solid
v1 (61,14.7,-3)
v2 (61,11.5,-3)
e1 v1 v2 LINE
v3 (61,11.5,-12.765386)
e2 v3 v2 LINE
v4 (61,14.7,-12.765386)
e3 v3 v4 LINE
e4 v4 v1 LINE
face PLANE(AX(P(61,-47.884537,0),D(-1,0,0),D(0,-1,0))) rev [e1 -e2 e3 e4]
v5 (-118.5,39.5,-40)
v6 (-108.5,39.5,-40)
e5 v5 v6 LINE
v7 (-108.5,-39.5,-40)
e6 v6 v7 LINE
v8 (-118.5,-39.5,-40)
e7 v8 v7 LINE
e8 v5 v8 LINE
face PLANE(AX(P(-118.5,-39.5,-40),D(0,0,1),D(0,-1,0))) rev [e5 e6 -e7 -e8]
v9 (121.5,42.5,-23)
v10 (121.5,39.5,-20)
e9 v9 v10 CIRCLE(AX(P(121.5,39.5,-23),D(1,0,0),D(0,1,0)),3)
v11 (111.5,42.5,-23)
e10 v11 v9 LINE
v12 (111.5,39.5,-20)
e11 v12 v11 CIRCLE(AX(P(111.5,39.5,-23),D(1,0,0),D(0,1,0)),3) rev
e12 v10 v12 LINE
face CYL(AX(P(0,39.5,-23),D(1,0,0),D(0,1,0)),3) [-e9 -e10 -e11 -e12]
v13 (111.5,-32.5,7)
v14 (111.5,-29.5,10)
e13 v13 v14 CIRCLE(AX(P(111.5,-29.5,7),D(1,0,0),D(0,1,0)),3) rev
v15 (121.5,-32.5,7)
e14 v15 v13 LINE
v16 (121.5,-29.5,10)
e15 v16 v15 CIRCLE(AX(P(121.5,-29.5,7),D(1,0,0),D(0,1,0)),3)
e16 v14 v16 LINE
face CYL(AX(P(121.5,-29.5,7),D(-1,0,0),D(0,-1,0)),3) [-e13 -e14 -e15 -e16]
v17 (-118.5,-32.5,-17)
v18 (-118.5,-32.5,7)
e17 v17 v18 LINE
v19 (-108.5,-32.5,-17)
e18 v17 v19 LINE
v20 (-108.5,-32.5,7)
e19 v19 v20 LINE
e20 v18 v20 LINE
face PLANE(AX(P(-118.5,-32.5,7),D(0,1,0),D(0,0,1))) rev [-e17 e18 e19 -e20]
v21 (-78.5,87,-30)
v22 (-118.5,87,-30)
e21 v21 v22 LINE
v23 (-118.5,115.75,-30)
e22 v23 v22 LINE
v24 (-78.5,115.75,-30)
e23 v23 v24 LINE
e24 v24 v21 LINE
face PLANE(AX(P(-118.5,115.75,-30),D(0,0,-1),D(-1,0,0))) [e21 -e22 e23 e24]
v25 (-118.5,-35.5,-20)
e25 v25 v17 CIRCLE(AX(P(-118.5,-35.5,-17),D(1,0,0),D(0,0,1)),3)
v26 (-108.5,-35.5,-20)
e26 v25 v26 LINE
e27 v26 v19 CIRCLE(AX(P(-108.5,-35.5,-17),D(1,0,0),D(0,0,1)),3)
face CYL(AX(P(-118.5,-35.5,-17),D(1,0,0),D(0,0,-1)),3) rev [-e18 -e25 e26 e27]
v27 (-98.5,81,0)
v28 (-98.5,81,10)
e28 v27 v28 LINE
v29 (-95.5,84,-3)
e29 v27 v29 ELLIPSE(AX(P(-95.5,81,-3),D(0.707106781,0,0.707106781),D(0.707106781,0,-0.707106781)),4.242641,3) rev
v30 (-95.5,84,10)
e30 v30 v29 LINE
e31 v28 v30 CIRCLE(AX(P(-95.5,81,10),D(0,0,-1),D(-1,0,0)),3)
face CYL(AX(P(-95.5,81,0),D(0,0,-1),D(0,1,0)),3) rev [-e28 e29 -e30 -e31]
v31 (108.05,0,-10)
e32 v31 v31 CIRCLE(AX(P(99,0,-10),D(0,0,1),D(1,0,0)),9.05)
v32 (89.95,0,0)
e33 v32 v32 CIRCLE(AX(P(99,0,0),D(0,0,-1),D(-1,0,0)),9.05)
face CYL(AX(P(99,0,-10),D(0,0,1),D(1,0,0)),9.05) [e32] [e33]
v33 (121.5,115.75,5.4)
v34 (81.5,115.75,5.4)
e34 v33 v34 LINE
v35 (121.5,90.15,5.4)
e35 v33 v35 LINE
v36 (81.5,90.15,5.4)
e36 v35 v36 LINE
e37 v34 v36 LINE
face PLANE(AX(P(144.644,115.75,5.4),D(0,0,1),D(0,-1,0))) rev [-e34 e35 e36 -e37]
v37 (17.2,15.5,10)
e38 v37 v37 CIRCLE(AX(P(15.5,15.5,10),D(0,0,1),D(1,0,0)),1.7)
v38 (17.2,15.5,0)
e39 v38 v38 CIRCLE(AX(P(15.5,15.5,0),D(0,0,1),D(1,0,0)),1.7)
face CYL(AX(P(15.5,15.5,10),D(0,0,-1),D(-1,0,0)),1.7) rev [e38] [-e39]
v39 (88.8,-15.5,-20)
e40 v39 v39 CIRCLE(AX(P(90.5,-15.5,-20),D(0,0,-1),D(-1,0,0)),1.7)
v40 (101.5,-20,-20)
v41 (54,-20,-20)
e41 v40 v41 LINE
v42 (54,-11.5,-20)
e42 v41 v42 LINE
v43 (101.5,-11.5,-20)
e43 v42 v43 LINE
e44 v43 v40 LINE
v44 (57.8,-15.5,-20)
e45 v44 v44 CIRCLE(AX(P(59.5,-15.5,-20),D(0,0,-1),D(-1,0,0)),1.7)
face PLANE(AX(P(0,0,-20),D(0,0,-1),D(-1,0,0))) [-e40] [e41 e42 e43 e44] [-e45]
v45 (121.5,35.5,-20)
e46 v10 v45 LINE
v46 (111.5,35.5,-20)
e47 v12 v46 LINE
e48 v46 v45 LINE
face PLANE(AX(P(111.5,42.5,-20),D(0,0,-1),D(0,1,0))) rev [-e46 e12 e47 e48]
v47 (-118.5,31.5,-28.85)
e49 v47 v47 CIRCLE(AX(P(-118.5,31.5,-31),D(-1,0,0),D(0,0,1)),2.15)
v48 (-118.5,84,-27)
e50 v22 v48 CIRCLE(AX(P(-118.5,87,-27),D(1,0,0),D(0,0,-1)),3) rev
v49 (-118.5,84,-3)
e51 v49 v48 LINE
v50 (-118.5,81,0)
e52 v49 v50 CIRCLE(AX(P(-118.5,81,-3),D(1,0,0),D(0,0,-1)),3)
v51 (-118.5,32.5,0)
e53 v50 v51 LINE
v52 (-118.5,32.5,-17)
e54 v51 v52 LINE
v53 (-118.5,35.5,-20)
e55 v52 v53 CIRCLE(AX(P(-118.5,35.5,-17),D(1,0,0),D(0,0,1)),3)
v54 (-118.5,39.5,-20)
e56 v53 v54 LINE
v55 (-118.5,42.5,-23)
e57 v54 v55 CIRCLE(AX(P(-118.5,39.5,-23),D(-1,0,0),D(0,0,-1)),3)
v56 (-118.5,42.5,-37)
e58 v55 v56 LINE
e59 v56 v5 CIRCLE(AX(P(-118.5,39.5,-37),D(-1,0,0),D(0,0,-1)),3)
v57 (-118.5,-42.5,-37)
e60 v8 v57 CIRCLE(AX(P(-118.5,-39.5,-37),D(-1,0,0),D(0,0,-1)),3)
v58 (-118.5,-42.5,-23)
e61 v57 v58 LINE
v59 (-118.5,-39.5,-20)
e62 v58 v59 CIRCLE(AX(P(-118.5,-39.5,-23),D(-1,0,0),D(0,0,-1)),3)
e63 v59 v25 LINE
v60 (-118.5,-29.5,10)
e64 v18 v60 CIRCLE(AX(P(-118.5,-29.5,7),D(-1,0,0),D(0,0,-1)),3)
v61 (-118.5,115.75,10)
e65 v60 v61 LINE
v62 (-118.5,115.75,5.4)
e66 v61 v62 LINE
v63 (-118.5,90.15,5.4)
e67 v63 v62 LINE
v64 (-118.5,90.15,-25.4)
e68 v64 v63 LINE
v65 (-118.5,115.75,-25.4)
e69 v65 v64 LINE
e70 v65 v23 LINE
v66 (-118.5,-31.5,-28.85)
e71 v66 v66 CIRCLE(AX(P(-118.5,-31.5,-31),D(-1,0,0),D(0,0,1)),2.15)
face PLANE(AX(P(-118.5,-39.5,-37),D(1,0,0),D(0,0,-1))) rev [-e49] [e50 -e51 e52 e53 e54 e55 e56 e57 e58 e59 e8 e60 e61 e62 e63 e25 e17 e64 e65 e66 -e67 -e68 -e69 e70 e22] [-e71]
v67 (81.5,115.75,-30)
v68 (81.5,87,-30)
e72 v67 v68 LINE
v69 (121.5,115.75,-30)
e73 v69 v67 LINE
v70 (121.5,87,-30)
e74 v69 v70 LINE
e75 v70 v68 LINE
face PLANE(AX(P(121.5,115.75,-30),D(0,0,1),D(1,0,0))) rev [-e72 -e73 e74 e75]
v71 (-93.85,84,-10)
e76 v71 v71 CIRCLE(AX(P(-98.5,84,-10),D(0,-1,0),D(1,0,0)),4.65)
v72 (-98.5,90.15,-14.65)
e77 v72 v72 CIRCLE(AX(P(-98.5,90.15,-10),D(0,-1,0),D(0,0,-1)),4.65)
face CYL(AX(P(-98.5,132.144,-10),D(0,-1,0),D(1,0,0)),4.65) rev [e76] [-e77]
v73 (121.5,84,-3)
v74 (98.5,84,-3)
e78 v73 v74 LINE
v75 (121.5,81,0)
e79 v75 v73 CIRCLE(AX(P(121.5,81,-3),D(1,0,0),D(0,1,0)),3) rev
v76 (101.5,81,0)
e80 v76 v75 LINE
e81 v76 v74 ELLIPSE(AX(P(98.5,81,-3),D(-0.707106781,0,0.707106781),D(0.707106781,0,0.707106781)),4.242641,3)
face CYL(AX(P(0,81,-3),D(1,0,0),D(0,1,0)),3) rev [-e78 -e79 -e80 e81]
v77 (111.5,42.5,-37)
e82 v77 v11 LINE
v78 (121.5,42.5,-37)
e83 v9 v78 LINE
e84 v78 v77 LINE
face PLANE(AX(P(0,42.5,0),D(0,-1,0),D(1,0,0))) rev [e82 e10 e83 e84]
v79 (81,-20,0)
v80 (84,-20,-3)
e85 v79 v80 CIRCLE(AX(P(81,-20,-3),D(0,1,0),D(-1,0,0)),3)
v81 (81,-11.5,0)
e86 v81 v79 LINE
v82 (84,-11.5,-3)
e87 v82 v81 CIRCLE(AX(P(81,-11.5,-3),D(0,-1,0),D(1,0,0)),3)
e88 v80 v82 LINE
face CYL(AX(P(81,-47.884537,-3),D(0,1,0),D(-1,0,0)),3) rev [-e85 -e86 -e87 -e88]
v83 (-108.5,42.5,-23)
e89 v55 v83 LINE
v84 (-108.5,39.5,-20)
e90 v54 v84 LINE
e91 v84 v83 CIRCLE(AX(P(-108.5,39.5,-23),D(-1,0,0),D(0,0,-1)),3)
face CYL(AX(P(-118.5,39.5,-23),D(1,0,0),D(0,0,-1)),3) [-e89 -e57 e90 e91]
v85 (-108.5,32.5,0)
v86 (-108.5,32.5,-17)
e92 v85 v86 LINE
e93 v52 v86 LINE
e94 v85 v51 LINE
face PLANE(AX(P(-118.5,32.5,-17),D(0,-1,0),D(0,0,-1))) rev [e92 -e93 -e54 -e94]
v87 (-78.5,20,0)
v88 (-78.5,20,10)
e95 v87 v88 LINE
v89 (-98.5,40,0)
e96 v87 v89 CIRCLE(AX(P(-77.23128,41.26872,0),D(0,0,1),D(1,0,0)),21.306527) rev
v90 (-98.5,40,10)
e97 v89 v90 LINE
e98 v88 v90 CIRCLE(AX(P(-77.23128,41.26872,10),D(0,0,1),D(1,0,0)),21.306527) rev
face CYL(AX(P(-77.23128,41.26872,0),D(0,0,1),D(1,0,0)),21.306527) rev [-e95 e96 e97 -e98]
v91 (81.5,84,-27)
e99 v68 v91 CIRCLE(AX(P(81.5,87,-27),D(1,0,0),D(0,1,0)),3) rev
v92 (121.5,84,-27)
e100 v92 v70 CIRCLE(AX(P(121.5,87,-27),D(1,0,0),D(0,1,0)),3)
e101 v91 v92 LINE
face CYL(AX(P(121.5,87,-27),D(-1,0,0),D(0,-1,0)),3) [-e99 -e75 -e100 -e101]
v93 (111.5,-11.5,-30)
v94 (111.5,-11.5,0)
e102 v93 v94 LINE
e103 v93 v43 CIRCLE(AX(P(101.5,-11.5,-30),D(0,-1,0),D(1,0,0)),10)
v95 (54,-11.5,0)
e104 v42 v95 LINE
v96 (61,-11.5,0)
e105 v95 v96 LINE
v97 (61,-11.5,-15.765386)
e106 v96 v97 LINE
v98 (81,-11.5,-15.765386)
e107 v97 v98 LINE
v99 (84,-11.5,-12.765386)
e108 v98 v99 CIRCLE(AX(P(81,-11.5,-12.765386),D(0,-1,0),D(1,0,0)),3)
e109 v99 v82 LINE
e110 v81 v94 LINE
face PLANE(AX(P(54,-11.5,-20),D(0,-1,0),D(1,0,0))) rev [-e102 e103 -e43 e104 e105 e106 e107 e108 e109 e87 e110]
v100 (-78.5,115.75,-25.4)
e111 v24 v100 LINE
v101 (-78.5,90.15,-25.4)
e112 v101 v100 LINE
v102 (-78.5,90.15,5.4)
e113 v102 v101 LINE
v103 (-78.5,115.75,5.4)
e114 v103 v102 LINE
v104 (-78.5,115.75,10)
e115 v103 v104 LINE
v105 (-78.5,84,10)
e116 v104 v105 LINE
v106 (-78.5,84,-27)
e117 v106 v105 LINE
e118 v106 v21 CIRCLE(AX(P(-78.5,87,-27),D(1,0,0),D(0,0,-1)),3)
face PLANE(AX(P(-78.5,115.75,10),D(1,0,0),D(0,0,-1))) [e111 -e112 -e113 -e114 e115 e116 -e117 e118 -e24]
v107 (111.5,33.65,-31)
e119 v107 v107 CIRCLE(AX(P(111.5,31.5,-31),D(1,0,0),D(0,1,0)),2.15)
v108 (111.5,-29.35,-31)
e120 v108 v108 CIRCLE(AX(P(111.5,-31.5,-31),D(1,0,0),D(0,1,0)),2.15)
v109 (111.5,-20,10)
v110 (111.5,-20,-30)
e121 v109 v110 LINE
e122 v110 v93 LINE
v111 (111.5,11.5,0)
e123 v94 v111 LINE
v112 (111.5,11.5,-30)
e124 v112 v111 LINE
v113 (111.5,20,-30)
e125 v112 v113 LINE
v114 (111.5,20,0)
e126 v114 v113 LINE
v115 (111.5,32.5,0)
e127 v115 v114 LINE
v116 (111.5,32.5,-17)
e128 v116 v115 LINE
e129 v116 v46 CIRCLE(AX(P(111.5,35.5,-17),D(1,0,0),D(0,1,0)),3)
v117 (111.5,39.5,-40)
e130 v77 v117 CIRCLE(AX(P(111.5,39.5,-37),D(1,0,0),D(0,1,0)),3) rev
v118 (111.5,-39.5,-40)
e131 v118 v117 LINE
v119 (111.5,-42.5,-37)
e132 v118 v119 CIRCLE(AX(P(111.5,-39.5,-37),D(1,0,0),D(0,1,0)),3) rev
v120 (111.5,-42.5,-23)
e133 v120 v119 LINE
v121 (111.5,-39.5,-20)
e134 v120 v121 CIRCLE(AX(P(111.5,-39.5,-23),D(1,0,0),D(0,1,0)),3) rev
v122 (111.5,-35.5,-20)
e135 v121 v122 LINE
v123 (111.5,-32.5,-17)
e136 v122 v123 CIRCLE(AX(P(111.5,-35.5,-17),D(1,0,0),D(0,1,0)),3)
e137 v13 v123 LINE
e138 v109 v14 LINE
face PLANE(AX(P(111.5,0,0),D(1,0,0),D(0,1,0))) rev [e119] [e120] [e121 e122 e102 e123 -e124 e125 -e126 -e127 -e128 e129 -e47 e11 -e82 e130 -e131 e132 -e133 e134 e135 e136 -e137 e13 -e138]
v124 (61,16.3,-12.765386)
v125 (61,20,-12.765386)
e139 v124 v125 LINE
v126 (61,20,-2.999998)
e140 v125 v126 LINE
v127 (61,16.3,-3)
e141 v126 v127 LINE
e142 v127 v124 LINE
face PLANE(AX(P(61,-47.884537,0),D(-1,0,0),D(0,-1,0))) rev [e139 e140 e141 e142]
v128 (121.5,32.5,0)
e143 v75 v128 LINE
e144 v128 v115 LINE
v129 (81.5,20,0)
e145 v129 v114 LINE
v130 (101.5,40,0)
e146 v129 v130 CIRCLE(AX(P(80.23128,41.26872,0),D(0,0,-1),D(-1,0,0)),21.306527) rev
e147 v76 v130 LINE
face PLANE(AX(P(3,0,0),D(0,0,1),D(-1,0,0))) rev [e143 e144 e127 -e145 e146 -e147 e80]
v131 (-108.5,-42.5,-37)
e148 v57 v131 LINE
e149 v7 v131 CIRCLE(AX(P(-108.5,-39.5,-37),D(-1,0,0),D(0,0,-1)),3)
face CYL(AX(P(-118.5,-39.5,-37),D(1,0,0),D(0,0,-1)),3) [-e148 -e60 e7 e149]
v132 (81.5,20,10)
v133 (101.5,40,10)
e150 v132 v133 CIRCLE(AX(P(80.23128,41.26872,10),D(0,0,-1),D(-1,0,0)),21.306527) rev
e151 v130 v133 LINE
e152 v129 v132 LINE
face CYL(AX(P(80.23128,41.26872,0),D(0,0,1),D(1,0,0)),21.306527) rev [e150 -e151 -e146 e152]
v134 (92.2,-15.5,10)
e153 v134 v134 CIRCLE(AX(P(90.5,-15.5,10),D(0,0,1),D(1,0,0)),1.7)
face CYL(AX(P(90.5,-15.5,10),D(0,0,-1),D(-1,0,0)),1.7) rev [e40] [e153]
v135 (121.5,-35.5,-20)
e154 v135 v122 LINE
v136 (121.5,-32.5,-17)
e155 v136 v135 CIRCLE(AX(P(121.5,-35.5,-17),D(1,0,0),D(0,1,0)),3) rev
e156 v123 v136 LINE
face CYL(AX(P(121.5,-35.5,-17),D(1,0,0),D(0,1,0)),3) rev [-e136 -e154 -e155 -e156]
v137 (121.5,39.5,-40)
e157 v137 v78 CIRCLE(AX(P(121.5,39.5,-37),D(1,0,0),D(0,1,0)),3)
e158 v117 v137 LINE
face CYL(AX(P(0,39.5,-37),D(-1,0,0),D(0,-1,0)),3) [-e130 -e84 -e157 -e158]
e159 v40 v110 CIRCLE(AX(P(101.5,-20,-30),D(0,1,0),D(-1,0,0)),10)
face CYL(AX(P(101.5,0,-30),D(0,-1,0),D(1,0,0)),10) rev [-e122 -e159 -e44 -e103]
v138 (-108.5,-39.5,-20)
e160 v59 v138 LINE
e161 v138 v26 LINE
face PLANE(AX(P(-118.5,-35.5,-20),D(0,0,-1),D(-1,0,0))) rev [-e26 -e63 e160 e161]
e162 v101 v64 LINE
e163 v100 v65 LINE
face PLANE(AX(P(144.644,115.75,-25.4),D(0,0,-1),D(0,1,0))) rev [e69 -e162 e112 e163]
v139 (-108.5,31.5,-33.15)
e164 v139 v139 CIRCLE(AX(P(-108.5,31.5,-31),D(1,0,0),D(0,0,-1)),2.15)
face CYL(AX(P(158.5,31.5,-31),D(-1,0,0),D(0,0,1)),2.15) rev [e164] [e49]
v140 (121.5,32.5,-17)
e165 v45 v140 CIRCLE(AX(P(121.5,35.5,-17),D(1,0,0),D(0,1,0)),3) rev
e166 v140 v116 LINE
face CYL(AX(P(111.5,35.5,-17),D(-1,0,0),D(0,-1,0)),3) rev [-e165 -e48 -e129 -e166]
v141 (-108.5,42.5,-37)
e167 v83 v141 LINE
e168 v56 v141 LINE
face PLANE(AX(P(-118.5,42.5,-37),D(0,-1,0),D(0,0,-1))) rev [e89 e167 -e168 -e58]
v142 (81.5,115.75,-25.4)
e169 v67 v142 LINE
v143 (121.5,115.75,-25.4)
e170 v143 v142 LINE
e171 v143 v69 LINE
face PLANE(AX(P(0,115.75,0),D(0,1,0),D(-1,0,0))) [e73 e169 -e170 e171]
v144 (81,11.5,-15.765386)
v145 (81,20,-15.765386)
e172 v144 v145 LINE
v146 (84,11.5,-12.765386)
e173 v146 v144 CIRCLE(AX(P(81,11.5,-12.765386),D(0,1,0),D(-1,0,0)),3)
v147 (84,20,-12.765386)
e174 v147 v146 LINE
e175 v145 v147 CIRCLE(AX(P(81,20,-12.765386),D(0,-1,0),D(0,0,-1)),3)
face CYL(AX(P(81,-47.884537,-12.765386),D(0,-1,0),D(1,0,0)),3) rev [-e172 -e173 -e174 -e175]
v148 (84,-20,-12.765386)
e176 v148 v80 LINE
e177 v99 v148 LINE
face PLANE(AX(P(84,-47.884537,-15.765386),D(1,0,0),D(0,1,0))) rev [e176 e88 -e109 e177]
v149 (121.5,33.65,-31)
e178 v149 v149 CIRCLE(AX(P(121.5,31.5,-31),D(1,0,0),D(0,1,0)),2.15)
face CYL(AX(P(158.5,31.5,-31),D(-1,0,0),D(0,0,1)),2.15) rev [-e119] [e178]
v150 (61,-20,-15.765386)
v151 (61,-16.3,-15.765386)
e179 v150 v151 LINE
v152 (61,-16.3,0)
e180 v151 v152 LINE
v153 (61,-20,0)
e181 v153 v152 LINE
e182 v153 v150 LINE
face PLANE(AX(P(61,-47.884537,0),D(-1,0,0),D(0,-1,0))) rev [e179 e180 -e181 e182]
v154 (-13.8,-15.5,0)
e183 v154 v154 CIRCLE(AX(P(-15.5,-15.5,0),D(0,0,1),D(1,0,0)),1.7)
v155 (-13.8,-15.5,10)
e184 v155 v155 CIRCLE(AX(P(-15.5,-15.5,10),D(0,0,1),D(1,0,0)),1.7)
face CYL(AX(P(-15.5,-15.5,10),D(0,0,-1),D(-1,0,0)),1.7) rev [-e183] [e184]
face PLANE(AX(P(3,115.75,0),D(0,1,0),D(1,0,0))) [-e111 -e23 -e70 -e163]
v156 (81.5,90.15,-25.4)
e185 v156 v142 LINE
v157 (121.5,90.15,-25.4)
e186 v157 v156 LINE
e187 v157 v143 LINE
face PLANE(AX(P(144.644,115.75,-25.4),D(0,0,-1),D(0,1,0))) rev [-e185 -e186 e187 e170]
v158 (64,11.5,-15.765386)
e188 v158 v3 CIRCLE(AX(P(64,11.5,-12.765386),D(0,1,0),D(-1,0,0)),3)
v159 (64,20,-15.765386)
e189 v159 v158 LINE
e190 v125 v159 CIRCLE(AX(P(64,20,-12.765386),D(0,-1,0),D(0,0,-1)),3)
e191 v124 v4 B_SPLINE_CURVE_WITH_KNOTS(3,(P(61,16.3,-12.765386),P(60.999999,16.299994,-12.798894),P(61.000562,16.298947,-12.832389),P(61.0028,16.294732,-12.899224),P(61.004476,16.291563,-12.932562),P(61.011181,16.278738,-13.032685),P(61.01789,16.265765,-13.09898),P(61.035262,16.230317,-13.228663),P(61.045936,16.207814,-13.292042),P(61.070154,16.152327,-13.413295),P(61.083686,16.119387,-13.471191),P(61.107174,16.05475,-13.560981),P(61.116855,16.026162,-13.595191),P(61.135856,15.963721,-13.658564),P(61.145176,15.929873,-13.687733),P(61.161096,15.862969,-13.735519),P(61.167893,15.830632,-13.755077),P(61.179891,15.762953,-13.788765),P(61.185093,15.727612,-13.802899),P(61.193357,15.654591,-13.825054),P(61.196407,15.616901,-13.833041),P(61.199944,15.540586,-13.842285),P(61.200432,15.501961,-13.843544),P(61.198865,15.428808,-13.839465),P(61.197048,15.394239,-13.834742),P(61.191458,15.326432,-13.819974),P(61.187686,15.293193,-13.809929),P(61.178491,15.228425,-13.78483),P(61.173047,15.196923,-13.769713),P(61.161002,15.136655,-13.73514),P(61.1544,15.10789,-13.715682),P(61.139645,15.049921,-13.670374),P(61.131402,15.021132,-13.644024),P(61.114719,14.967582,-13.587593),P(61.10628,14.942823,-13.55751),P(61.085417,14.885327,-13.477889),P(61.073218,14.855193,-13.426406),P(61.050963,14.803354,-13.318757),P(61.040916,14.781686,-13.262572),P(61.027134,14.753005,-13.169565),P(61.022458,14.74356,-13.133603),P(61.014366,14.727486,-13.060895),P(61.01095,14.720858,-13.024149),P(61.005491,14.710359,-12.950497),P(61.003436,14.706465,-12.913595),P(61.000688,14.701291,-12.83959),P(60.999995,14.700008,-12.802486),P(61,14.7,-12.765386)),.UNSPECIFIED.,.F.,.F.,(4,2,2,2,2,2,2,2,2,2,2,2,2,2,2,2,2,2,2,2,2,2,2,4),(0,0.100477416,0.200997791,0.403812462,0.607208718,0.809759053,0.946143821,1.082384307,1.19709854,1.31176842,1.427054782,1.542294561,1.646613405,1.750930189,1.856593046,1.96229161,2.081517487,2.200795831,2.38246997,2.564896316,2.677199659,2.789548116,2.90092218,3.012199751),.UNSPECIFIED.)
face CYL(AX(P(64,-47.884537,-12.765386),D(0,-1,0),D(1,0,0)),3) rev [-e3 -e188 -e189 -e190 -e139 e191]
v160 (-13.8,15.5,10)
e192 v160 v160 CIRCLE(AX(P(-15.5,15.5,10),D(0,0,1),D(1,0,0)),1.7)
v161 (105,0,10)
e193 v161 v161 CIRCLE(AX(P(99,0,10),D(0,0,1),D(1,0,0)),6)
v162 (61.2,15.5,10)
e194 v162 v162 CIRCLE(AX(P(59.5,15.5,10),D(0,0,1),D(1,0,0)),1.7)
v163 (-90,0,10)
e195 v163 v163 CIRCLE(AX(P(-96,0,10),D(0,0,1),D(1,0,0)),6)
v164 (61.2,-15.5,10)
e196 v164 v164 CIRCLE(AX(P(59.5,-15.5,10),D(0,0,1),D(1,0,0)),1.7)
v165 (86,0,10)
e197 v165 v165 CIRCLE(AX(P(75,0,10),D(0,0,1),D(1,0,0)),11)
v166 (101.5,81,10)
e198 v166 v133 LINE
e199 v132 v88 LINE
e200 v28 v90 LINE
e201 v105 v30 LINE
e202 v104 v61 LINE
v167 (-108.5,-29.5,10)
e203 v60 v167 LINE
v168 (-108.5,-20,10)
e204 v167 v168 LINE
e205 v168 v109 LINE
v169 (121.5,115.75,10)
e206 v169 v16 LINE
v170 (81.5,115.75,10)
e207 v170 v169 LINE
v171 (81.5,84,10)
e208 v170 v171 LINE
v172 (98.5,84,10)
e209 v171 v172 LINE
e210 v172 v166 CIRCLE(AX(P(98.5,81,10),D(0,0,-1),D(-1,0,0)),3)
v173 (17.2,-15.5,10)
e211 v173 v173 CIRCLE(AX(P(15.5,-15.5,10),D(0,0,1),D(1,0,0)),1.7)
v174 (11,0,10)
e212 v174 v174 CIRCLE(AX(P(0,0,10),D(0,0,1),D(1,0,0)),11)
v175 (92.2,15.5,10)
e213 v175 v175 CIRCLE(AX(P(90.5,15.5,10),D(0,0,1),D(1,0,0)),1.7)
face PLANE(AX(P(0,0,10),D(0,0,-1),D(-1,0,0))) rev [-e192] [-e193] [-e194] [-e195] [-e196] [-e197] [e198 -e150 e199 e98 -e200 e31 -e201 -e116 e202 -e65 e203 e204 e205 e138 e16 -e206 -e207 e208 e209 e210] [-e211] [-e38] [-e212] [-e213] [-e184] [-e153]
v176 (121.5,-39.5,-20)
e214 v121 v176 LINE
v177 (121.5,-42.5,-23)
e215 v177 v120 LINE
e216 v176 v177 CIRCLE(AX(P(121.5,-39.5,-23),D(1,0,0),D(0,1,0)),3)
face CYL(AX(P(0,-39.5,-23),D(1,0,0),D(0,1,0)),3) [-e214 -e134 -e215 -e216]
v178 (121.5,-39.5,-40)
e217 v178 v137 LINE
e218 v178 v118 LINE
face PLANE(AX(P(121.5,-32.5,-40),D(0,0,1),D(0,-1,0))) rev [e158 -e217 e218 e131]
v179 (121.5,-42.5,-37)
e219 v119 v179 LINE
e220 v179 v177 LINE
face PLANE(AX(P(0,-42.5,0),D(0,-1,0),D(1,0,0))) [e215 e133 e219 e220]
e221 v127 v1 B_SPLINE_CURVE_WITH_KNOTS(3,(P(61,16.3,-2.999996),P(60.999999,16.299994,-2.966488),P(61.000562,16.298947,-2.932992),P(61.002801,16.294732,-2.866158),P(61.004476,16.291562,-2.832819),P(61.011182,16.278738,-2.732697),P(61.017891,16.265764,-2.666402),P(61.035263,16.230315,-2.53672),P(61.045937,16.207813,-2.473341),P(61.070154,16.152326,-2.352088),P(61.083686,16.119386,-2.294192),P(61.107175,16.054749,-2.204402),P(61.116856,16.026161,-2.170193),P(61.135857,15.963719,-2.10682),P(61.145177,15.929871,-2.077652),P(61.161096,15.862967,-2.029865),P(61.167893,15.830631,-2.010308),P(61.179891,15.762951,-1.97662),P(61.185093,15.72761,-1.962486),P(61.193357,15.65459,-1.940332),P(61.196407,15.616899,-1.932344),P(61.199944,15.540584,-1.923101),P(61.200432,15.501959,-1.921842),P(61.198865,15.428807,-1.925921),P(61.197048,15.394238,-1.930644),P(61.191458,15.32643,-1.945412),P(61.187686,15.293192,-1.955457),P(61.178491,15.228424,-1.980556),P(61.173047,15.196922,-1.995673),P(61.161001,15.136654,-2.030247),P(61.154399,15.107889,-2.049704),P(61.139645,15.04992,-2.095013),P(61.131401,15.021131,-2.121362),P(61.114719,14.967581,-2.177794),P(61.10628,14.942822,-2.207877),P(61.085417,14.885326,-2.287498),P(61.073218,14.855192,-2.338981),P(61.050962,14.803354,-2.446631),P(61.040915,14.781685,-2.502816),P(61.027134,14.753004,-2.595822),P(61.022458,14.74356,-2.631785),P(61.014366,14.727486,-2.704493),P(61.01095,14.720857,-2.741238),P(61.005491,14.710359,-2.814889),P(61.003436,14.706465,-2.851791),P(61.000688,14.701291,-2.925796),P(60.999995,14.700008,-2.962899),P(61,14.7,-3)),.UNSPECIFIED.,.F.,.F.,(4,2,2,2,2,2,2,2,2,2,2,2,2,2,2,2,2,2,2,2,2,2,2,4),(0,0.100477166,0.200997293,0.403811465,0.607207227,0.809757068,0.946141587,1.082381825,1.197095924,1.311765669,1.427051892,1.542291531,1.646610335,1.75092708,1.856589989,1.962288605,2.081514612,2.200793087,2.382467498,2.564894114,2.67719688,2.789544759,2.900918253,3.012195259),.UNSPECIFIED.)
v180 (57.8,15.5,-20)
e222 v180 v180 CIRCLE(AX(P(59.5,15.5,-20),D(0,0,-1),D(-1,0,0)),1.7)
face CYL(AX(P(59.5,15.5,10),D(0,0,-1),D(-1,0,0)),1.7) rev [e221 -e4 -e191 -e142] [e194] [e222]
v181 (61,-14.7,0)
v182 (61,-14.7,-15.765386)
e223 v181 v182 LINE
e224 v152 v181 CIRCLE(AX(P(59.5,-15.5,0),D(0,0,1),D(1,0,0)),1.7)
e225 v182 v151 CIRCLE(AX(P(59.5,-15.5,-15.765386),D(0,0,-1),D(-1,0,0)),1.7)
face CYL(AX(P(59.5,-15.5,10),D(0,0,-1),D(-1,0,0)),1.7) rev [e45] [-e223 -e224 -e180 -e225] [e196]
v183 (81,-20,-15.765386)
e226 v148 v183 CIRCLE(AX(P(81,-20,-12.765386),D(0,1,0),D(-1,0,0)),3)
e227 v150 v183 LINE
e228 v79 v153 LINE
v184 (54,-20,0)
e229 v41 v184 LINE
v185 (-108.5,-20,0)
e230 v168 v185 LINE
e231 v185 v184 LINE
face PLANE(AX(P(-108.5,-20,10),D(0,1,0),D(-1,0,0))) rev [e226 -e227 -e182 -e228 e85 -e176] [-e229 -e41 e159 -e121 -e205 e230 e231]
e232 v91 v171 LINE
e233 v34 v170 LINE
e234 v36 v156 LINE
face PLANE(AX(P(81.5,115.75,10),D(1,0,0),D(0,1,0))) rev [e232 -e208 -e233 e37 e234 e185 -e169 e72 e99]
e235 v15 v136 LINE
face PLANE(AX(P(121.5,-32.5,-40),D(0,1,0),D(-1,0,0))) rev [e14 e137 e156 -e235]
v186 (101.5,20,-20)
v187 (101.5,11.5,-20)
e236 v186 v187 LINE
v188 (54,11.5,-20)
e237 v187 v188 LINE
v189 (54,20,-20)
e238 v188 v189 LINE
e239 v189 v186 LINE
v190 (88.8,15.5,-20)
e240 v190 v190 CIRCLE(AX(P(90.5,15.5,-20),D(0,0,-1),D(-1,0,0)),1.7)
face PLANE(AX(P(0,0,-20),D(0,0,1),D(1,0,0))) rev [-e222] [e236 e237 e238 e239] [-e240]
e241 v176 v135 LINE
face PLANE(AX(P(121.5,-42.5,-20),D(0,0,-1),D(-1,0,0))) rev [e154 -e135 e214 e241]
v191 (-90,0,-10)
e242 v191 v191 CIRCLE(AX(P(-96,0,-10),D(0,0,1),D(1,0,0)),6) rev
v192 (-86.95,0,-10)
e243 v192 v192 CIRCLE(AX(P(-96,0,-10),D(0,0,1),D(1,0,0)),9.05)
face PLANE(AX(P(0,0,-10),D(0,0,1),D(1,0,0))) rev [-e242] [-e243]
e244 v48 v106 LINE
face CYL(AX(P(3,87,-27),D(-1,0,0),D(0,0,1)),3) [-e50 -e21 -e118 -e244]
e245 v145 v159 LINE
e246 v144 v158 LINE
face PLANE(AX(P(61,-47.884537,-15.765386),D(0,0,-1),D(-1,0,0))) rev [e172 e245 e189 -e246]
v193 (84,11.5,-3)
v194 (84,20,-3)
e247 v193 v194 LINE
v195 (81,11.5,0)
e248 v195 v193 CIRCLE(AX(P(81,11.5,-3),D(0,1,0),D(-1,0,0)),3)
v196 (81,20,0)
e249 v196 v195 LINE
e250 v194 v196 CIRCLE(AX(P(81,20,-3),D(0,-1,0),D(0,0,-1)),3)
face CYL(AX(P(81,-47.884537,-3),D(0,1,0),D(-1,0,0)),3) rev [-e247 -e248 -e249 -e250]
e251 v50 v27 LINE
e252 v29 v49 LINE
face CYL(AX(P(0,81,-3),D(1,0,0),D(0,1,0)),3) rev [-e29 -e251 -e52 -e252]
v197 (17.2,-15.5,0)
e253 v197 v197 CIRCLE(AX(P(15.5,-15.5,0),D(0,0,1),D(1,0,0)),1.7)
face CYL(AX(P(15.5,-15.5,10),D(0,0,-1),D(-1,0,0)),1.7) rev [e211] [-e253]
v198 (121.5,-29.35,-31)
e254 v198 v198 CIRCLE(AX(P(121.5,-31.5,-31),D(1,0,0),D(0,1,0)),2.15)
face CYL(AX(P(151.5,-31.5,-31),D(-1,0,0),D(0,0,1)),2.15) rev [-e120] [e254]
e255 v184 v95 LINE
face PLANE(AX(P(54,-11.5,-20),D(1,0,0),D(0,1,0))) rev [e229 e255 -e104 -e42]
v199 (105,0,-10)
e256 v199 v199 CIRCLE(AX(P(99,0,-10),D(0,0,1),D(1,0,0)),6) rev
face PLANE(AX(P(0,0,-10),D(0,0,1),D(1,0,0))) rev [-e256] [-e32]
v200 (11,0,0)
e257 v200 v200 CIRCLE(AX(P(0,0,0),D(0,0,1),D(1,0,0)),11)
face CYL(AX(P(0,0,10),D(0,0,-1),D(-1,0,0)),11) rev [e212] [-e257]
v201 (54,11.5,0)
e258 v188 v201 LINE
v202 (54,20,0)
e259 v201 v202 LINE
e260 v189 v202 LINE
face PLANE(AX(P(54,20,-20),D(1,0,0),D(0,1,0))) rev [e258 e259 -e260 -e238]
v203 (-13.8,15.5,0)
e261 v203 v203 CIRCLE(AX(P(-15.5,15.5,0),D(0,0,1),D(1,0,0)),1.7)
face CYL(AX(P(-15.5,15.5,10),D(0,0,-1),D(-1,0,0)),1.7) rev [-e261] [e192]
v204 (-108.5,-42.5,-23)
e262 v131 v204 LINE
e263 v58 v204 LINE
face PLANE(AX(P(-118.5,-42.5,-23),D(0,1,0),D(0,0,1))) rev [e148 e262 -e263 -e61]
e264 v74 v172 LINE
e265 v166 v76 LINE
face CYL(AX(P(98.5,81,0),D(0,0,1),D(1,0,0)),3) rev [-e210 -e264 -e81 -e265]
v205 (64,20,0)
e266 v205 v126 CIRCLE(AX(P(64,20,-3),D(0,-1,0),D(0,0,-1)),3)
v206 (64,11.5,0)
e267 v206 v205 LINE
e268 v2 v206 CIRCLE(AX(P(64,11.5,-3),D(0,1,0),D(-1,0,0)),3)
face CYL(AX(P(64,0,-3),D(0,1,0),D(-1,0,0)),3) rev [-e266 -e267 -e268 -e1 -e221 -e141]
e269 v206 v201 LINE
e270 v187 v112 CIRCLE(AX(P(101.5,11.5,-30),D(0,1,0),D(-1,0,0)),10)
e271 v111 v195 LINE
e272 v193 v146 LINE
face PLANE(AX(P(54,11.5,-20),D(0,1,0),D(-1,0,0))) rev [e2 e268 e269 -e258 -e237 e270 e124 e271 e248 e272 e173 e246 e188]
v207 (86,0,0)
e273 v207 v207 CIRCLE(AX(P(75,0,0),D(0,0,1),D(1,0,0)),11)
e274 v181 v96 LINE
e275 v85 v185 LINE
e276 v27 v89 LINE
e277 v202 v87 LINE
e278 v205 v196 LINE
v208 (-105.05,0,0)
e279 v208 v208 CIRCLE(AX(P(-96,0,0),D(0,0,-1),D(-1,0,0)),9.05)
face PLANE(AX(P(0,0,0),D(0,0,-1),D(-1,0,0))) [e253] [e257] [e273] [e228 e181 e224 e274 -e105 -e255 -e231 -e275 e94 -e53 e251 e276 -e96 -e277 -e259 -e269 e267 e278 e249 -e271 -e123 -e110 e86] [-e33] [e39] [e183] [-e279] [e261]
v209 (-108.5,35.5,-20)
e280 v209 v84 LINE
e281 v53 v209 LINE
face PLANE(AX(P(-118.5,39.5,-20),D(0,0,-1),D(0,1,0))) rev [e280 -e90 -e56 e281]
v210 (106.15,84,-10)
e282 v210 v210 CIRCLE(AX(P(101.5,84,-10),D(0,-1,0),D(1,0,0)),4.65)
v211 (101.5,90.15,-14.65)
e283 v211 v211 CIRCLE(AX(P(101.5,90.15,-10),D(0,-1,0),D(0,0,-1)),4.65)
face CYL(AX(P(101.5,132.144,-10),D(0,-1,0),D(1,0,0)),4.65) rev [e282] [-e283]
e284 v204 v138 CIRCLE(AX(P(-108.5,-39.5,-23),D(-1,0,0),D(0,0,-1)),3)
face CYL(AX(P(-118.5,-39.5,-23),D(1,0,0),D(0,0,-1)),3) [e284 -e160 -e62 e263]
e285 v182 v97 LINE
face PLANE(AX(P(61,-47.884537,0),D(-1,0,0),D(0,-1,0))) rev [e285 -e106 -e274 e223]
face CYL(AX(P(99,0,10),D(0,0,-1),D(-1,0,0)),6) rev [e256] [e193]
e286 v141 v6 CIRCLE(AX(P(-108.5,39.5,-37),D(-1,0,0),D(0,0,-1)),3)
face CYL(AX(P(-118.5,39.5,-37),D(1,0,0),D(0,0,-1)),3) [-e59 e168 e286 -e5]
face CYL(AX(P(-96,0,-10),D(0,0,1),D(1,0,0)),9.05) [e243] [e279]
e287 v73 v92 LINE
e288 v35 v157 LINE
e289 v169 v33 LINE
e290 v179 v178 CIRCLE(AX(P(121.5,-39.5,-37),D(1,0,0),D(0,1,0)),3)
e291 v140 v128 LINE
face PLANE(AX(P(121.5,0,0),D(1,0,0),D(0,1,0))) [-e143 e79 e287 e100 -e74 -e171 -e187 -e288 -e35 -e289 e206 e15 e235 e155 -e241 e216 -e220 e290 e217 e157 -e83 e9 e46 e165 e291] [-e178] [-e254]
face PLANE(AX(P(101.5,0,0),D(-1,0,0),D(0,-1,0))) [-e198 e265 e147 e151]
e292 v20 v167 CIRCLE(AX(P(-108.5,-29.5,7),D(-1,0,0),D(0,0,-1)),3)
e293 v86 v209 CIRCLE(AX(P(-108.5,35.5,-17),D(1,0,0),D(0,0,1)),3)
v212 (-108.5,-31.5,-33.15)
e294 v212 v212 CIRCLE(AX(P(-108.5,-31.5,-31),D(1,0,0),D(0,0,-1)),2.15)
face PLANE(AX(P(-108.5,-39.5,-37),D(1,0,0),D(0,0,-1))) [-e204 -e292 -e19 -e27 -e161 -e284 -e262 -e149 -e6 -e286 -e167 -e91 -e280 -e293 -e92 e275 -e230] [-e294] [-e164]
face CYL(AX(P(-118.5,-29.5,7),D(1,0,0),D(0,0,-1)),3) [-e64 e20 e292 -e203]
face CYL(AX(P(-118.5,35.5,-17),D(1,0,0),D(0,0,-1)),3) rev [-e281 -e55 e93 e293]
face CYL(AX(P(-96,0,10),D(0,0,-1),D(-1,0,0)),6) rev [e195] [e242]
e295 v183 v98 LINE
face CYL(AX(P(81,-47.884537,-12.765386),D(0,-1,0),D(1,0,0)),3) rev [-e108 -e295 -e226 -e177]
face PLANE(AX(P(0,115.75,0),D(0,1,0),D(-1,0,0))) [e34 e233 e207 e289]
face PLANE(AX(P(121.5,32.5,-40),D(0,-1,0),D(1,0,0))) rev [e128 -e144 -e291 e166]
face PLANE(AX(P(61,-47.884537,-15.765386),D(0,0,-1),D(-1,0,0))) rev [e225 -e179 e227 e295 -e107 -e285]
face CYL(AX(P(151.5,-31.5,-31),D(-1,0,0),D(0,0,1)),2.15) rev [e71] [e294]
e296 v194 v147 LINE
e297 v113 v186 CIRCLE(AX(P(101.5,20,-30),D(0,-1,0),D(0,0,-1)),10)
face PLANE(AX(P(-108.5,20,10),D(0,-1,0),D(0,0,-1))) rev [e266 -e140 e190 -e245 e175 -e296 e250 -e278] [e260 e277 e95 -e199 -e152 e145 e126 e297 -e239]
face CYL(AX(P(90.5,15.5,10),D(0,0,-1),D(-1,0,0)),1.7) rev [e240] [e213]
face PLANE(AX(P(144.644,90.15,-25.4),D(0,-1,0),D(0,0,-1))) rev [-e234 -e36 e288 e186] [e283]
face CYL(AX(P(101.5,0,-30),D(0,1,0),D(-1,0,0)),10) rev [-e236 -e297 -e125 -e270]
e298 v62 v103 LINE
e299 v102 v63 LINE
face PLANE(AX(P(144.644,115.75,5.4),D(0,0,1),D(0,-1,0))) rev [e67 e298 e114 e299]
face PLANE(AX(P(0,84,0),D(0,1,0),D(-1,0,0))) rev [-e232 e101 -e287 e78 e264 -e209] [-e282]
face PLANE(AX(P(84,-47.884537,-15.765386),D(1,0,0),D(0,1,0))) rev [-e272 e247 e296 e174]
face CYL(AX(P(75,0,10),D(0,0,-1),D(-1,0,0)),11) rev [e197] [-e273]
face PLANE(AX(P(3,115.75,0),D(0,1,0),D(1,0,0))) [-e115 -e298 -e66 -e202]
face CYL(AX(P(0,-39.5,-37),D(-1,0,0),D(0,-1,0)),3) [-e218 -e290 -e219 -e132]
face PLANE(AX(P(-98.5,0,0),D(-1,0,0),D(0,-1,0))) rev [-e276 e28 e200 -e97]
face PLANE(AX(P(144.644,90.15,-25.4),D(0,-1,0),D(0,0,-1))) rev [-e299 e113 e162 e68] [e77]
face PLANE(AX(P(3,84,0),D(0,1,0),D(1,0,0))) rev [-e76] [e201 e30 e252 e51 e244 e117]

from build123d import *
from build123d.topology import SkipClean

# Parameters (mm, degrees)
SKETCH1_W            = 220
SKETCH1_H            = 40
SKETCH1_R            = 6
SKETCH1_R_2          = 1.7
SKETCH1_R_3          = 11
BOSS_EXTRUDE1_DEPTH  = 10
BOSS_EXTRUDE3_START  = -20
SKETCH3_R            = 9.05
SKETCH3_R_2          = 6
BOSS_EXTRUDE3_DEPTH  = 20
SKETCH4_W            = 50
SKETCH4_H            = 65
BOSS_EXTRUDE4_DEPTH  = 10
SKETCH5_W            = 57.5
SKETCH5_H            = 8.5
BOSS_EXTRUDE5_DEPTH  = 20
CUT_EXTRUDE3_START   = -40
SKETCH7_W            = 23
SKETCH7_H            = 15.765385727
CUT_EXTRUDE3_DEPTH   = 40
SKETCH11_W           = 10
SKETCH11_H           = 20
BOSS_EXTRUDE6_DEPTH  = 10
SKETCH12_W           = 10
SKETCH12_H           = 20
BOSS_EXTRUDE7_DEPTH  = 10
FILLET2_R            = 3
FILLET3_R            = 10
BOSS_EXTRUDE8_START  = 10
BOSS_EXTRUDE8_DEPTH  = 10
SKETCH20_R           = 2.15
CUT_EXTRUDE11_DEPTH  = 277
SKETCH19_R           = 2.15
CUT_EXTRUDE12_DEPTH  = 270
BOSS_EXTRUDE9_DEPTH  = 10
SKETCH22_W           = 40
SKETCH22_H           = 40
BOSS_EXTRUDE10_DEPTH = 31.75
SKETCH23_W           = 30.8
SKETCH23_H           = 25.6
CUT_EXTRUDE13_DEPTH  = 263.144
SKETCH24_R           = 4.65
CUT_EXTRUDE14_DEPTH  = 48.144
FILLET4_R            = 3
SKETCH25_R           = 1.7
CUT_EXTRUDE16_DEPTH  = 60.144


with BuildPart() as part:
    # Sketch1 → Boss-Extrude1 (new body)
    with BuildSketch(Plane.XY):
        with Locations((1.5, 0)):
            Rectangle(SKETCH1_W, SKETCH1_H)
        with Locations((99, 0)):
            Circle(SKETCH1_R, mode=Mode.SUBTRACT)
        with Locations((-96, 0)):
            Circle(SKETCH1_R, mode=Mode.SUBTRACT)
        with Locations((-15.5, 15.5)):
            Circle(SKETCH1_R_2, mode=Mode.SUBTRACT)
        with Locations((15.5, 15.5)):
            Circle(SKETCH1_R_2, mode=Mode.SUBTRACT)
        Circle(SKETCH1_R_3, mode=Mode.SUBTRACT)
        with Locations((-15.5, -15.5)):
            Circle(SKETCH1_R_2, mode=Mode.SUBTRACT)
        with Locations((15.5, -15.5)):
            Circle(SKETCH1_R_2, mode=Mode.SUBTRACT)
        with Locations((75, 0)):
            Circle(SKETCH1_R_3, mode=Mode.SUBTRACT)
        with Locations((59.5, 15.5)):
            Circle(SKETCH1_R_2, mode=Mode.SUBTRACT)
        with Locations((59.5, -15.5)):
            Circle(SKETCH1_R_2, mode=Mode.SUBTRACT)
        with Locations((90.5, 15.5)):
            Circle(SKETCH1_R_2, mode=Mode.SUBTRACT)
        with Locations((90.5, -15.5)):
            Circle(SKETCH1_R_2, mode=Mode.SUBTRACT)
    extrude(amount=BOSS_EXTRUDE1_DEPTH)

    # Sketch3 → Boss-Extrude3 (add)
    # profile 1 of 2: a face of its own
    with BuildSketch(Plane.XY.offset(10).offset(BOSS_EXTRUDE3_START)):
        with Locations((-96, 0)):
            Circle(SKETCH3_R)
        with Locations((-96, 0)):
            Circle(SKETCH3_R_2, mode=Mode.SUBTRACT)
    # profile 2 of 2: a face of its own
    with BuildSketch(Plane.XY.offset(10).offset(BOSS_EXTRUDE3_START)):
        with Locations((99, 0)):
            Circle(SKETCH3_R)
        with Locations((99, 0)):
            Circle(SKETCH3_R_2, mode=Mode.SUBTRACT)
    extrude(amount=BOSS_EXTRUDE3_DEPTH)

    # Sketch4 → Boss-Extrude4 (add)
    with BuildSketch(Plane(origin=(111.5, 0, 0), x_dir=(0, 0, -1), z_dir=(1, 0, 0))):
        with Locations((15, 0)):
            Rectangle(SKETCH4_W, SKETCH4_H)
    extrude(amount=BOSS_EXTRUDE4_DEPTH)

    # Sketch5 → Boss-Extrude5 (add)
    with BuildSketch(Plane(origin=(0, 0, 0), x_dir=(-1, 0, 0), z_dir=(0, 0, -1))):
        with Locations((-82.75, 15.75)):
            Rectangle(SKETCH5_W, SKETCH5_H)
        with Locations((-82.75, -15.75)):
            Rectangle(SKETCH5_W, SKETCH5_H)
    extrude(amount=BOSS_EXTRUDE5_DEPTH)

    # Sketch7 → Cut-Extrude3 (cut)
    with BuildSketch(Plane(origin=(0, 20, 0), x_dir=(1, 0, 0), z_dir=(0, 1, 0)).offset(CUT_EXTRUDE3_START)):
        with Locations((72.5, 7.882692864)):
            Rectangle(SKETCH7_W, SKETCH7_H)
    extrude(amount=CUT_EXTRUDE3_DEPTH, mode=Mode.SUBTRACT)

    # Sketch11 → Boss-Extrude6 (add)
    with BuildSketch(Plane(origin=(0, 32.5, 0), x_dir=(1, 0, 0), z_dir=(0, 1, 0))):
        with Locations((116.5, 30)):
            Rectangle(SKETCH11_W, SKETCH11_H)
    extrude(amount=BOSS_EXTRUDE6_DEPTH)

    # Sketch12 → Boss-Extrude7 (add)
    with BuildSketch(Plane.XZ.offset(32.5)):
        with Locations((116.5, -30)):
            Rectangle(SKETCH12_W, SKETCH12_H)
    extrude(amount=BOSS_EXTRUDE7_DEPTH)

    # Fillet2
    # the kernel refuses this fillet: 3 mm, written as the material it adds along each edge
    with BuildSketch(Plane(origin=(121.5, -32.5, -20), x_dir=(0, 0, 1), z_dir=(-1, 0, 0))) as fillet2_piece_1:
        with BuildLine():
            CenterArc((FILLET2_R, -FILLET2_R), FILLET2_R, 90, 90)
            Line((0, -FILLET2_R), (0, 0))
            Line((0, 0), (FILLET2_R, 0))
        make_face()
    extrude(amount=10)
    with BuildSketch(Plane(origin=(111.5, 32.5, -20), x_dir=(0, 1, 0), z_dir=(1, 0, 0))) as fillet2_piece_2:
        with BuildLine():
            CenterArc((FILLET2_R, FILLET2_R), FILLET2_R, 180, 90)
            Line((0, FILLET2_R), (0, 0))
            Line((0, 0), (FILLET2_R, 0))
        make_face()
    extrude(amount=10)
    with BuildSketch(Plane(origin=(84, 11.5, -15.765385727), x_dir=(0, 0, 1), z_dir=(0, 1, 0)), Plane(origin=(61, 11.5, -15.765385727), x_dir=(1, 0, 0), z_dir=(0, 1, 0)), Plane(origin=(84, 11.5, 0), x_dir=(-1, 0, 0), z_dir=(0, 1, 0)), Plane(origin=(84, -20, 0), x_dir=(-1, 0, 0), z_dir=(0, 1, 0))) as fillet2_piece_3:
        with BuildLine():
            CenterArc((FILLET2_R, -FILLET2_R), FILLET2_R, 90, 90)
            Line((0, -FILLET2_R), (0, 0))
            Line((0, 0), (FILLET2_R, 0))
        make_face()
    extrude(amount=8.5)
    with BuildSketch(Plane(origin=(61, 11.5, 0), x_dir=(1, 0, 0), z_dir=(0, 1, 0))) as fillet2_piece_4_section:
        with BuildLine():
            CenterArc((FILLET2_R, FILLET2_R), FILLET2_R, 180, 90)
            Line((0, FILLET2_R), (0, 0))
            Line((0, 0), (FILLET2_R, 0))
        make_face()
    fillet2_piece_4 = extrude(amount=10.7, mode=Mode.PRIVATE)
    fillet2_piece_4 = fillet2_piece_4 - Plane(origin=(59.5, 15.5, -0.653390462), x_dir=(1, 0, 0), z_dir=(0, 0, -1)) * Cylinder(1.7, 34, mode=Mode.PRIVATE)
    fillet2_piece_4 = split(fillet2_piece_4, bisect_by=Plane(origin=(61.689155884, 20, -0.653390462), z_dir=(0, -1, 0)), keep=Keep.TOP, mode=Mode.PRIVATE)
    add(fillet2_piece_4)
    with BuildSketch(Plane(origin=(84, -20, -15.765385727), x_dir=(-1, 0, 0), z_dir=(0, 1, 0))) as fillet2_piece_5:
        with BuildLine():
            CenterArc((FILLET2_R, FILLET2_R), FILLET2_R, 180, 90)
            Line((0, FILLET2_R), (0, 0))
            Line((0, 0), (FILLET2_R, 0))
        make_face()
    extrude(amount=8.5)
    # the kernel refuses this fillet: 3 mm, written as the material it takes off along each edge
    with BuildSketch(Plane(origin=(104, -32.5, 10), x_dir=(0, 0, -1), z_dir=(1, 0, 0)), Plane(origin=(129, -42.5, -20), x_dir=(0, 1, 0), z_dir=(-1, 0, 0)), Plane(origin=(129, 42.5, -40), x_dir=(0, -1, 0), z_dir=(-1, 0, 0))) as fillet2_2_piece_1:
        with BuildLine():
            CenterArc((FILLET2_R, FILLET2_R), FILLET2_R, 180, 90)
            Line((0, FILLET2_R), (0, 0))
            Line((0, 0), (FILLET2_R, 0))
        make_face()
    extrude(amount=25, mode=Mode.SUBTRACT)
    with BuildSketch(Plane(origin=(104, -42.5, -40), x_dir=(0, 0, 1), z_dir=(1, 0, 0)), Plane(origin=(104, 32.5, 10), x_dir=(0, 0, -1), z_dir=(1, 0, 0)), Plane(origin=(104, 42.5, -20), x_dir=(0, 0, -1), z_dir=(1, 0, 0))) as fillet2_2_piece_2:
        with BuildLine():
            CenterArc((FILLET2_R, -FILLET2_R), FILLET2_R, 90, 90)
            Line((0, -FILLET2_R), (0, 0))
            Line((0, 0), (FILLET2_R, 0))
        make_face()
    extrude(amount=25, mode=Mode.SUBTRACT)

    # Fillet3
    fillet3_edges = [part.edges().sort_by_distance(p)[0] for p in [
        (111.5, 15.75, -20),
        (111.5, -15.75, -20),
    ]]
    fillet(fillet3_edges, radius=FILLET3_R)

    # Sketch13 → Boss-Extrude8 (add)
    with BuildSketch(Plane.ZY.offset(108.5).offset(BOSS_EXTRUDE8_START)):
        with BuildLine():
            Line((10, 29.5), (10, -29.5))
            ThreePointArc((10, -29.5), (9.121320344, -31.621320344), (7, -32.5))
            Line((7, -32.5), (-17, -32.5))
            ThreePointArc((-17, -32.5), (-19.121320344, -33.378679656), (-20, -35.5))
            Line((-20, -35.5), (-20, -39.5))
            ThreePointArc((-20, -39.5), (-20.878679656, -41.621320344), (-23, -42.5))
            Line((-23, -42.5), (-37, -42.5))
            ThreePointArc((-37, -42.5), (-39.121320344, -41.621320344), (-40, -39.5))
            Line((-40, -39.5), (-40, 39.5))
            ThreePointArc((-40, 39.5), (-39.121320344, 41.621320344), (-37, 42.5))
            Line((-37, 42.5), (-23, 42.5))
            ThreePointArc((-23, 42.5), (-20.878679656, 41.621320344), (-20, 39.5))
            Line((-20, 39.5), (-20, 35.5))
            ThreePointArc((-20, 35.5), (-19.121320344, 33.378679656), (-17, 32.5))
            Line((-17, 32.5), (7, 32.5))
            ThreePointArc((7, 32.5), (9.121320344, 31.621320344), (10, 29.5))
        make_face()
    extrude(amount=-BOSS_EXTRUDE8_DEPTH)

    # Sketch20 → Cut-Extrude11 (cut)
    with BuildSketch(Plane.ZY.offset(118.5)):
        with Locations((-31, 31.5)):
            Circle(SKETCH20_R)
    extrude(amount=-CUT_EXTRUDE11_DEPTH, mode=Mode.SUBTRACT)

    # Sketch19 → Cut-Extrude12 (cut)
    with BuildSketch(Plane.ZY.offset(118.5)):
        with Locations((-31, -31.5)):
            Circle(SKETCH19_R)
    extrude(amount=-CUT_EXTRUDE12_DEPTH, mode=Mode.SUBTRACT)

    # Sketch16 → Boss-Extrude9 (add)
    with BuildSketch(Plane.XY.offset(10)):
        with BuildLine():
            Line((-98.5, 84), (-118.5, 84))
            Line((-118.5, 84), (-118.5, 29.5))
            Line((-118.5, 29.5), (-108.5, 29.5))
            Line((-108.5, 29.5), (-108.5, 20))
            Line((-108.5, 20), (-78.5, 20))
            ThreePointArc((-78.5, 20), (-92.297269835, 26.202730165), (-98.5, 40))
            Line((-98.5, 40), (-98.5, 84))
        make_face()
    boss_extrude9 = extrude(amount=-BOSS_EXTRUDE9_DEPTH)

    # Mirror1: Boss-Extrude9 across plane
    add(boss_extrude9.mirror(Plane(origin=(1.5, 0, 0), x_dir=(0, 0, 1), z_dir=(1, 0, 0))))

    # Sketch22 → Boss-Extrude10 (add)
    with BuildSketch(Plane(origin=(0, 84, 0), x_dir=(1, 0, 0), z_dir=(0, 1, 0))):
        with Locations((101.5, 10)):
            Rectangle(SKETCH22_W, SKETCH22_H)
    boss_extrude10 = extrude(amount=BOSS_EXTRUDE10_DEPTH)

    # Mirror2: Boss-Extrude10 across plane
    add(boss_extrude10.mirror(Plane(origin=(1.5, 0, 0), x_dir=(0, 0, 1), z_dir=(1, 0, 0))))

    # Sketch23 → Cut-Extrude13 (cut)
    with BuildSketch(Plane.ZY.offset(118.5)):
        with Locations((-10, 102.95)):
            Rectangle(SKETCH23_W, SKETCH23_H)
    extrude(amount=-CUT_EXTRUDE13_DEPTH, mode=Mode.SUBTRACT)

    # Sketch24 → Cut-Extrude14 (cut)
    with BuildSketch(Plane.XZ.offset(-84)):
        with Locations((-98.5, -10)):
            Circle(SKETCH24_R)
        with Locations((101.5, -10)):
            Circle(SKETCH24_R)
    extrude(amount=-CUT_EXTRUDE14_DEPTH, mode=Mode.SUBTRACT)

    # Fillet4
    fillet4_edges = [part.edges().sort_by_distance(p)[0] for p in [
        (-98.5, 84, 5),
        (-108.5, 84, 0),
        (111.5, 84, 0),
        (101.5, 84, 5),
        (101.5, 84, -30),
        (-98.5, 84, -30),
    ]]
    fillet(fillet4_edges, radius=FILLET4_R)

    # Sketch25 → Cut-Extrude16 (cut)
    with SkipClean():  # the faces are left unmerged after this step: merging them gives an invalid solid
        with BuildSketch(Plane(origin=(0, 0, -20), x_dir=(-1, 0, 0), z_dir=(0, 0, -1))):
            with Locations((-90.5, 15.5)):
                Circle(SKETCH25_R)
            with Locations((-59.5, 15.5)):
                Circle(SKETCH25_R)
            with Locations((-90.5, -15.5)):
                Circle(SKETCH25_R)
            with Locations((-59.5, -15.5)):
                Circle(SKETCH25_R)
        extrude(amount=-CUT_EXTRUDE16_DEPTH, mode=Mode.SUBTRACT)


solid = part.part
